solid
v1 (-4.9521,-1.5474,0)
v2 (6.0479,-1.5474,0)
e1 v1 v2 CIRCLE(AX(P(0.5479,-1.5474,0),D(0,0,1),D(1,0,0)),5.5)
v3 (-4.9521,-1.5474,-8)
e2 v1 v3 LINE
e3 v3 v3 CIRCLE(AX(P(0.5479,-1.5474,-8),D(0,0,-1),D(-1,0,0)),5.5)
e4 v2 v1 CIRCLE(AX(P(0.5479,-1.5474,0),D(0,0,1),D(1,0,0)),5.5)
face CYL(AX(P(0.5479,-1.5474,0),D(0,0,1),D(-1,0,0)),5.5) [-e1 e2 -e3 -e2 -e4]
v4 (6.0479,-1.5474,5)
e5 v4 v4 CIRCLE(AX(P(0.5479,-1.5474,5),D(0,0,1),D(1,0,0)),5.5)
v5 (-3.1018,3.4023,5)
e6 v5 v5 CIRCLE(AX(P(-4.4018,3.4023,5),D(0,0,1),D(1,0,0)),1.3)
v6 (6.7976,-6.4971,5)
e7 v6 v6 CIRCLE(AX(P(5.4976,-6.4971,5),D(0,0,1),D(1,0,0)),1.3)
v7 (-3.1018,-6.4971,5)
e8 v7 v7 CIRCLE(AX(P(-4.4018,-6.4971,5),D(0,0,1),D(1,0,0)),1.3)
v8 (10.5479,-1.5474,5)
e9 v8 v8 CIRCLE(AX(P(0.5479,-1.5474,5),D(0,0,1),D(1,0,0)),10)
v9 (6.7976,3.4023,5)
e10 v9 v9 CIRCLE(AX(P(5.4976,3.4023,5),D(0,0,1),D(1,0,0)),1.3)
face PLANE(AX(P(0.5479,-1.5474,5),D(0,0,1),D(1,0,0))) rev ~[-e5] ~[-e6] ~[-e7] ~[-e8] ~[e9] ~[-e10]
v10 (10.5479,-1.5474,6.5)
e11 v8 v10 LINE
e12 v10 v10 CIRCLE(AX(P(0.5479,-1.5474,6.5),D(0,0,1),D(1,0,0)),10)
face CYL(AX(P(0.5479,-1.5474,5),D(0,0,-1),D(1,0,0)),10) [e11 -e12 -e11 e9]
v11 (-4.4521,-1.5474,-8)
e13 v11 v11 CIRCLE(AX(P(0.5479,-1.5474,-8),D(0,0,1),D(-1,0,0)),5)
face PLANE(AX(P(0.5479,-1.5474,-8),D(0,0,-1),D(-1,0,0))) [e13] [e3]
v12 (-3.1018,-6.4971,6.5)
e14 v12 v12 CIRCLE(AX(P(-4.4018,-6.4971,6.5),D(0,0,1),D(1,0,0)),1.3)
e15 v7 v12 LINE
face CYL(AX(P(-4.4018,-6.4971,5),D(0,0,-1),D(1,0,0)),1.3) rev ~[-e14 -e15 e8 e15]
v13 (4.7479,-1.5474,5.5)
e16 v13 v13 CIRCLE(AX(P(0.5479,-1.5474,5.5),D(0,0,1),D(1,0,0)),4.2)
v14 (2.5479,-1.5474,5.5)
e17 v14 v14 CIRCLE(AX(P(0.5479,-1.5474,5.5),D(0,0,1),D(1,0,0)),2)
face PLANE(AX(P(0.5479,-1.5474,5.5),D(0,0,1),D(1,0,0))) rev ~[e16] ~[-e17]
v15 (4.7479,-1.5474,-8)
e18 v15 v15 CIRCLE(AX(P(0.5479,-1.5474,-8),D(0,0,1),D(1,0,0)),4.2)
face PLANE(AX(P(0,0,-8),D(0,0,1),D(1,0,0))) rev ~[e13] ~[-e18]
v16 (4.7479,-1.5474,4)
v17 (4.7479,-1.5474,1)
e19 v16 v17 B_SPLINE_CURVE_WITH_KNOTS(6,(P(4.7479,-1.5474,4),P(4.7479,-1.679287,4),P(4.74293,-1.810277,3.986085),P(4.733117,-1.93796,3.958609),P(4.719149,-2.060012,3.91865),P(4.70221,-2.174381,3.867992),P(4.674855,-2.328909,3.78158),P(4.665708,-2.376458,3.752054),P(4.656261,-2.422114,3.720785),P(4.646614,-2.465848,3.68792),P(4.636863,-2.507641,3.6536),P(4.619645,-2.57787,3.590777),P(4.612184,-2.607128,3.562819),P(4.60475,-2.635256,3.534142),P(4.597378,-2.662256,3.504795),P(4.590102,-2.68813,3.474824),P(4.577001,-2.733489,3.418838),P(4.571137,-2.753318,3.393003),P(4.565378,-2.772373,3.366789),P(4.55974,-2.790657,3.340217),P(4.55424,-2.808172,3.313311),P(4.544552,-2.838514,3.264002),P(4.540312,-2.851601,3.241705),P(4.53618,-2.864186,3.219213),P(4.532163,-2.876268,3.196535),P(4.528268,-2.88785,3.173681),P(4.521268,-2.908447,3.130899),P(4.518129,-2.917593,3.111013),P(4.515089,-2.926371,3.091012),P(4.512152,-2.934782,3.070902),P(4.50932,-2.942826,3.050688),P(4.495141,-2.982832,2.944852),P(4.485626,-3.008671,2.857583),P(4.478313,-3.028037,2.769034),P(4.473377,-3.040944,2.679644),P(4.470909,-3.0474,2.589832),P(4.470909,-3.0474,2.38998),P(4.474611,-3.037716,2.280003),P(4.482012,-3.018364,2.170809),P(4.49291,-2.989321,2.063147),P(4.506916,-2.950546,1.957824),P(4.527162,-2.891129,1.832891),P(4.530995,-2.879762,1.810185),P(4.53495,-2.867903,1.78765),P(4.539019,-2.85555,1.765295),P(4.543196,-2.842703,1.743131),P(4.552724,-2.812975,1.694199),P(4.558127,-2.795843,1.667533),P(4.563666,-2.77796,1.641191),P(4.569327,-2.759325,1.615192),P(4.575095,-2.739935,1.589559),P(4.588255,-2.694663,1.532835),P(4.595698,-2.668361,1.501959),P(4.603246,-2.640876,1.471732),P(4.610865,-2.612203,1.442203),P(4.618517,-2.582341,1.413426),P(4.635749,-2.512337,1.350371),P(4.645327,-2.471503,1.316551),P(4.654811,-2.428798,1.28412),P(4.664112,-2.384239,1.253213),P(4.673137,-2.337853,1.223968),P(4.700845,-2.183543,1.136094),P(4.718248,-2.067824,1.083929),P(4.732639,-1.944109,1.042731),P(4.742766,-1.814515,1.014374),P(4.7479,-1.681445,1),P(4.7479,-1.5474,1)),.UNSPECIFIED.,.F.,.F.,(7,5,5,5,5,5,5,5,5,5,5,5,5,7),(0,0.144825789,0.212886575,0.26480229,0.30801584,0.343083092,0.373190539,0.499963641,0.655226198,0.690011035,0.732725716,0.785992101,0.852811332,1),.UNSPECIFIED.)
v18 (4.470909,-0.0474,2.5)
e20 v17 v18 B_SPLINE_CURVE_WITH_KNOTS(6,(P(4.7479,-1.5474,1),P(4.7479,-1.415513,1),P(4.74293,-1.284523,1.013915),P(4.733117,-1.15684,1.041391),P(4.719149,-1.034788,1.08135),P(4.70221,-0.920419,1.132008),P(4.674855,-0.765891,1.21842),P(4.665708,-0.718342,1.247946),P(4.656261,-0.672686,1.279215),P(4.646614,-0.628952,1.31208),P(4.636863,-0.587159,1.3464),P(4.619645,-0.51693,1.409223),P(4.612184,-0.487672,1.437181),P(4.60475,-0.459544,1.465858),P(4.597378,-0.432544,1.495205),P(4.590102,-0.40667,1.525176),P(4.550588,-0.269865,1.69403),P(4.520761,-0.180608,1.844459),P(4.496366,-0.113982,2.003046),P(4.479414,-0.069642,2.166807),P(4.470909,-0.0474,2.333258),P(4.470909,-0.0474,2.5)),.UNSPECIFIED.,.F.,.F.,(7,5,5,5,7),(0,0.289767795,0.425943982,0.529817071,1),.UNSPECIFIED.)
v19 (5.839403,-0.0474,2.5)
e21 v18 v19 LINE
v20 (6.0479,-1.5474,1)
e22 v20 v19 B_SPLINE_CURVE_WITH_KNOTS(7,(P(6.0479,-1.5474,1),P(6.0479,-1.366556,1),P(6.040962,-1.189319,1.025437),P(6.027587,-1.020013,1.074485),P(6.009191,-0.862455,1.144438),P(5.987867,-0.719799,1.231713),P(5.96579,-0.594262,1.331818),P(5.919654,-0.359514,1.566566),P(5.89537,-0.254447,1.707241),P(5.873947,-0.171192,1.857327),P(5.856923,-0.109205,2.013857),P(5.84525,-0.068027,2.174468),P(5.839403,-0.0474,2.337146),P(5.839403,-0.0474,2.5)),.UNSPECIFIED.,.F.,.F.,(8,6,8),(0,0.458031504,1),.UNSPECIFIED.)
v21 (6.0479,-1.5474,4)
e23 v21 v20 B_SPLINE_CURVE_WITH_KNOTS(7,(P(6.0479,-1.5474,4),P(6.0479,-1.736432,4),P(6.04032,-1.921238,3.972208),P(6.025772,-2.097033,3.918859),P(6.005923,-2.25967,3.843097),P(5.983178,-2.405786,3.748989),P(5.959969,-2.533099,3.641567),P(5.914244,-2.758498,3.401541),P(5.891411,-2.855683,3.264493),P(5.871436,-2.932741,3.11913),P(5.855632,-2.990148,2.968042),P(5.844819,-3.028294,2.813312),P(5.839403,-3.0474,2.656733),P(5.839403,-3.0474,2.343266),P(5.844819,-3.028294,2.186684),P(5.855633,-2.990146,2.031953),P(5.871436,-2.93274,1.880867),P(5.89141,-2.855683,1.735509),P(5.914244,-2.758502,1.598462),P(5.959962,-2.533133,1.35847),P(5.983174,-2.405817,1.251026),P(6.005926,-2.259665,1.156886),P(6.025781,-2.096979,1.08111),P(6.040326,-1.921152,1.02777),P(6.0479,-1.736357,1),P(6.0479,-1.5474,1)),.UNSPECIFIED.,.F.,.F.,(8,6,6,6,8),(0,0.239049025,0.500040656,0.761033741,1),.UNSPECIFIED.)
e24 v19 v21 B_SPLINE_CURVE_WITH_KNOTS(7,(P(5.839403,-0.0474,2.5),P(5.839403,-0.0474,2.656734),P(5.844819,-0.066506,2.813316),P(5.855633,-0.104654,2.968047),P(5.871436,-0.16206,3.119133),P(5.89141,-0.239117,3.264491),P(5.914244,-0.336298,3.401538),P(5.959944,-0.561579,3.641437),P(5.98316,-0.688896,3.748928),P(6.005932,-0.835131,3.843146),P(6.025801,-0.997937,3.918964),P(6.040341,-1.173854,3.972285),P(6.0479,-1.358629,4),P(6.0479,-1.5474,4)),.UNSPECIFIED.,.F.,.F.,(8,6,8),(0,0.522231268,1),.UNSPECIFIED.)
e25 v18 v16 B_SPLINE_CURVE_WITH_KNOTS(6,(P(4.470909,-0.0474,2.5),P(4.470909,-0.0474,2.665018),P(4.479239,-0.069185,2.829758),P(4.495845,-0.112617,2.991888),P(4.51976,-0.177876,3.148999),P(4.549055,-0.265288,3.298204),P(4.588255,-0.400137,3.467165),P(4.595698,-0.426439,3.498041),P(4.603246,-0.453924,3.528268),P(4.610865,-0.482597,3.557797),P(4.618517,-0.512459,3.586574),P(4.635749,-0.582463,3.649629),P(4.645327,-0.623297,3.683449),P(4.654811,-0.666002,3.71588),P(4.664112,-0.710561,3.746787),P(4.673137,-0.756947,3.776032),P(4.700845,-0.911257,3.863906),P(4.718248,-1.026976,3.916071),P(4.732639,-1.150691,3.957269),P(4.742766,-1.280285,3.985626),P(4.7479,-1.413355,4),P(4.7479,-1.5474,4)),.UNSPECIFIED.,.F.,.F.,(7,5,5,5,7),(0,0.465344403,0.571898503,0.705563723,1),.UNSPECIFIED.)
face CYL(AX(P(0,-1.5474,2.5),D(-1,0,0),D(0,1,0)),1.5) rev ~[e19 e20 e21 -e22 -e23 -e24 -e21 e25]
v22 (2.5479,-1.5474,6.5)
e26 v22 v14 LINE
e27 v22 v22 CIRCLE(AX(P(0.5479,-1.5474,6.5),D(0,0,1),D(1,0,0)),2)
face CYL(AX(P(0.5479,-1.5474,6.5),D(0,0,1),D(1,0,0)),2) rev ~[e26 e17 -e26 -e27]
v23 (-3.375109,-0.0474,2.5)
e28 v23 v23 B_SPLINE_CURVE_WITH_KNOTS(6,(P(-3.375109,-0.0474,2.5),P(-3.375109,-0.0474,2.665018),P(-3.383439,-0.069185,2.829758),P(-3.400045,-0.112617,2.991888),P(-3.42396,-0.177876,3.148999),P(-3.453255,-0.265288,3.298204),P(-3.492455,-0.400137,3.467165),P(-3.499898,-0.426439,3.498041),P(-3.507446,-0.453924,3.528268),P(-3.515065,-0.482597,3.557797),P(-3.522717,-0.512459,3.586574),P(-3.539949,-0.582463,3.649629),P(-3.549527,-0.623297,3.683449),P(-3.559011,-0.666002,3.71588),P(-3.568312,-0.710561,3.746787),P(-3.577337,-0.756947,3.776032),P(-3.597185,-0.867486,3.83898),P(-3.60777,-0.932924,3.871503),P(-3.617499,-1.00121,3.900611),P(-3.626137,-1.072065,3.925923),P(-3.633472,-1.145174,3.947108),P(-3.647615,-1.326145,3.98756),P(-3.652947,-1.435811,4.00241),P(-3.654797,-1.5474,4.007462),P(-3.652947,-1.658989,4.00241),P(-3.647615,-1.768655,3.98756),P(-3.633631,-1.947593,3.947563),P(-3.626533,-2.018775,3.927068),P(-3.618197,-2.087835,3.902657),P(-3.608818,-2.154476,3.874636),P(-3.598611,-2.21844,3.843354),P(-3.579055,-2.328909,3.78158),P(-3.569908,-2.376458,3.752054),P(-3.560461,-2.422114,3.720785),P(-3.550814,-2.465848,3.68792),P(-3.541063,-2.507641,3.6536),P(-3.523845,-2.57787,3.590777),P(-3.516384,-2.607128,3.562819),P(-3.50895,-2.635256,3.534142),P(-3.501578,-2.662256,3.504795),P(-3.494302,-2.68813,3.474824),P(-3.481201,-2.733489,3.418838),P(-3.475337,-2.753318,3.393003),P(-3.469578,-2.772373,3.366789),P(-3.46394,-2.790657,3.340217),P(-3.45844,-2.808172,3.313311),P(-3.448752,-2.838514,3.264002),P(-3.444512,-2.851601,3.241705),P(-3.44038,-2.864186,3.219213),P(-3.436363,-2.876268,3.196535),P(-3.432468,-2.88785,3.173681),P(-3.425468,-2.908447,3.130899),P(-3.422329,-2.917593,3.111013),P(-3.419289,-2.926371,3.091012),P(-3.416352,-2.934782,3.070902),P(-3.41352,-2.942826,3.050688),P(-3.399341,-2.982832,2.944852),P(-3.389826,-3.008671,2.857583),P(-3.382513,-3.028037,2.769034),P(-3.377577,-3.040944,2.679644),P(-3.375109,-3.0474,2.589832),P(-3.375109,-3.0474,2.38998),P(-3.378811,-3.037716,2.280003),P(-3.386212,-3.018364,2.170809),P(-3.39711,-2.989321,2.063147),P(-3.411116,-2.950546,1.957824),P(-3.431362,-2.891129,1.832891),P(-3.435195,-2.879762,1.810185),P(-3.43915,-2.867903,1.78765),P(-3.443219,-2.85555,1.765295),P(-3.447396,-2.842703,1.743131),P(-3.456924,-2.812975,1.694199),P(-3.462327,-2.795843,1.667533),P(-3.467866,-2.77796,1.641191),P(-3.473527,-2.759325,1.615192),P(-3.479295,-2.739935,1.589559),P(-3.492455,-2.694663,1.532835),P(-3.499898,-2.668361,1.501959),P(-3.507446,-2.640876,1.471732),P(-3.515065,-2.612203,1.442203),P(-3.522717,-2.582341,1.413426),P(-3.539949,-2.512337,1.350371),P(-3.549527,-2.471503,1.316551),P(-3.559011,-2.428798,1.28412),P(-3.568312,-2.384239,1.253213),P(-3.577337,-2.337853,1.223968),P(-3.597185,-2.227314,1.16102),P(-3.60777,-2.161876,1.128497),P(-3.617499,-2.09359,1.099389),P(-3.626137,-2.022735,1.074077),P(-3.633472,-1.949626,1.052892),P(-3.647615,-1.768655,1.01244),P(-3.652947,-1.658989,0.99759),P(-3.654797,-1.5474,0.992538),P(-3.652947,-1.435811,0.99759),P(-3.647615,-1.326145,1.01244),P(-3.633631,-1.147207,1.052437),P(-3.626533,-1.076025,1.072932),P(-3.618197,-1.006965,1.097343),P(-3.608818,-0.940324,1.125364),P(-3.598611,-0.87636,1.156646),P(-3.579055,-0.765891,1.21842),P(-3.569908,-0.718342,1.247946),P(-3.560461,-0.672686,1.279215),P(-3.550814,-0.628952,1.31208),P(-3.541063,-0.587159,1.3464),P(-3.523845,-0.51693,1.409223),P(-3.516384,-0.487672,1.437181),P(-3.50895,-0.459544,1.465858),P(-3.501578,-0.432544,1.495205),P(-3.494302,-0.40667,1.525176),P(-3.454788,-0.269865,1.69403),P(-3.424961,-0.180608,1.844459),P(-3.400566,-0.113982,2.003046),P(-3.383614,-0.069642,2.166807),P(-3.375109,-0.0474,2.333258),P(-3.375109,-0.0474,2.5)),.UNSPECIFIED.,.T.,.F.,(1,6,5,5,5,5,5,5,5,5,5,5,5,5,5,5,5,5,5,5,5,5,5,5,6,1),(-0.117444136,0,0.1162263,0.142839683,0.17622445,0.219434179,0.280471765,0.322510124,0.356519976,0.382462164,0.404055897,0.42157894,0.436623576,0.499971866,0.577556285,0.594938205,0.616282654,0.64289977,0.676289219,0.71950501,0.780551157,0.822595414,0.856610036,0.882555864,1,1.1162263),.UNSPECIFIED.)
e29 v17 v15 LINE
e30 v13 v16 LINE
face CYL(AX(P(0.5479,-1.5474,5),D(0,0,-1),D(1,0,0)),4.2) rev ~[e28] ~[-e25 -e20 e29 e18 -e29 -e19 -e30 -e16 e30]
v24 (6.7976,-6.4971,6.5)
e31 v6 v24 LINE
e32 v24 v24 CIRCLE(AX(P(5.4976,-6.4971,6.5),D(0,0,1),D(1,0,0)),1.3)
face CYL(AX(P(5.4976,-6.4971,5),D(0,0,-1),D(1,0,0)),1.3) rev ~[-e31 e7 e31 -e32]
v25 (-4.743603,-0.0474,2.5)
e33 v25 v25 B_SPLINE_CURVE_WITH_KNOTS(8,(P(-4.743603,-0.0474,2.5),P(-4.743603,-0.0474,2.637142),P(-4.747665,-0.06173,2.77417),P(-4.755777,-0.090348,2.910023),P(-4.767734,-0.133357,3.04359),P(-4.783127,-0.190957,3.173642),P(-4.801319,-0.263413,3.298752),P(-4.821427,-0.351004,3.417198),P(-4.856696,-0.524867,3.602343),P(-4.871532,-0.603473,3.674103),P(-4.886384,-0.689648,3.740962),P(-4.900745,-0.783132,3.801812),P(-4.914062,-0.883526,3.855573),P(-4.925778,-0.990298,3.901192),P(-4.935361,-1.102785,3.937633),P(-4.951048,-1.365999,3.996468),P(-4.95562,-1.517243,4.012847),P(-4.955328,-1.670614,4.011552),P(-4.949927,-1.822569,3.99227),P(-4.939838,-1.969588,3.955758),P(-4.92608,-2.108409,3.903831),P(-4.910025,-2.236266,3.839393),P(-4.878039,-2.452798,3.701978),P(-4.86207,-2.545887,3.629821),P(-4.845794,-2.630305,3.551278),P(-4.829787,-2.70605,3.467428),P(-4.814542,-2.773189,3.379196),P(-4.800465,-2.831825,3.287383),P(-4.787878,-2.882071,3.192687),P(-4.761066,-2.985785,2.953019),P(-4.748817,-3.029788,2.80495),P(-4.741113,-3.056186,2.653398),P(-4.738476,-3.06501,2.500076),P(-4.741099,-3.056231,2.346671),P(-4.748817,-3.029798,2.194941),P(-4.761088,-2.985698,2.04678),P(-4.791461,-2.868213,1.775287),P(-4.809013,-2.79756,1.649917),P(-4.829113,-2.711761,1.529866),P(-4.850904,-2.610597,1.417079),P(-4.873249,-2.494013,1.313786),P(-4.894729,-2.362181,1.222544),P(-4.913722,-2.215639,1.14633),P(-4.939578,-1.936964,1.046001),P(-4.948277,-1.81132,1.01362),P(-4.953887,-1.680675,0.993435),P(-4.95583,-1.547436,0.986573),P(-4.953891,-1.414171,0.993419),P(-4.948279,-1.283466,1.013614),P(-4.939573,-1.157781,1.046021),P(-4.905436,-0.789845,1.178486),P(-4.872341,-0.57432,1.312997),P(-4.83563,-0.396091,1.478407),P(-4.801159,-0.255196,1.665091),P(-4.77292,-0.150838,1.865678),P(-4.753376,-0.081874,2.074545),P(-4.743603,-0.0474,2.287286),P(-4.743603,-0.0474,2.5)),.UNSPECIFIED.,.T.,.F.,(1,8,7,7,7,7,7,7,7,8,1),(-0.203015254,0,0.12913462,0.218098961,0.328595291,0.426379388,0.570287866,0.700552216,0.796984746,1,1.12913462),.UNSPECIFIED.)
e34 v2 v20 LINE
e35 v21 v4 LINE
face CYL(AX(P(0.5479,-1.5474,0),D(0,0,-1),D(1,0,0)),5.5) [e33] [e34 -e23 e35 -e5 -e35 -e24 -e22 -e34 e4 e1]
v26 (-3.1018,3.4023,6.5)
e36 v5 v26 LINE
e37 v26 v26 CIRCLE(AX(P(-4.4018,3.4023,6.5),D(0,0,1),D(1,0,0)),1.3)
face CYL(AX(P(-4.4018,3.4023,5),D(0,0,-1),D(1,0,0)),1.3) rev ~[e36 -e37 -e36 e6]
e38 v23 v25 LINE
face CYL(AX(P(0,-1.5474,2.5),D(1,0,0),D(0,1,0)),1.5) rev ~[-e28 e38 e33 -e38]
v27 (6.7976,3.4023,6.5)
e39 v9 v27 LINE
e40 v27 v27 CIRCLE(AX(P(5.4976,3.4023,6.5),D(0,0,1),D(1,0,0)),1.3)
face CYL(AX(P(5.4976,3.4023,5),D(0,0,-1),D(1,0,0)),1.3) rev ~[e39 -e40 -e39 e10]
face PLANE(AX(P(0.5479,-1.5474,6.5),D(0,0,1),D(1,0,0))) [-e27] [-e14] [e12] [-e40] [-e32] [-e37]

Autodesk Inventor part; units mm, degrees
ref_plane "YZ Plane" through (0, 0, 0) normal (1, 0, 0) x (0, 1, 0)
ref_plane "XZ Plane" through (0, 0, 0) normal (0, 1, 0) x (-1, 0, 0)
ref_plane "XY Plane" through (0, 0, 0) normal (0, 0, 1) x (1, 0, 0)
sketch "스케치1" plane through (0, 0, 0) normal (0, 0, 1) x (1, 0, 0)
  circle A0 centre (0.5479, -1.5474) radius 5.5
  circle A1 centre (0.5479, -1.5474) radius 5
  circle A2 centre (0.5479, -1.5474) radius 4.2
  ellipse E0 centre (0.5479, -1.5474) end of major axis (-0.0909, -9.0201) minor radius 7.4992
  ellipse E1 centre (0.5479, -1.5474) end of major axis (-0.0912, -9.0201) minor radius 7.4991
  ellipse E2 centre (0.5479, -1.5474) end of major axis (1.2999, 2.3813) minor radius 3.9993 (-3.4513, -1.5143) -> (4.5471, -1.5804) ccw projected
  dimension "d0" = 10
  dimension "d1" = 8.4
  dimension "d24" = 11
extrude "돌출1" add sketch "스케치1" against normal blind 8 contours A1
sketch "스케치2" plane through (0.5479, -1.5474, 0) normal (0, 0, 1) x (1, 0, 0)
  circle A0 centre (0, 0) radius 4.2 projected
  circle A1 centre (0, 0) radius 5.5
  dimension "d4" = 11
extrude "돌출2" add sketch "스케치2" along normal blind 5
sketch "스케치3" plane through (0.5479, -1.5474, 5) normal (0, 0, 1) x (1, 0, 0)
  circle A0 centre (0, 0) radius 5.5 projected
  circle A1 centre (0, 0) radius 4.2 projected
  circle A2 centre (0, 0) radius 10
  circle A3 centre (4.9497, -4.9497) radius 1.3
  circle A4 centre (0, 0) radius 5 projected
  line L0 (0, 0) -> (0, -5.5) construction
  circle A5 centre (4.9497, 4.9497) radius 1.3
  circle A6 centre (-4.9497, 4.9497) radius 1.3
  circle A7 centre (-4.9497, -4.9497) radius 1.3
  dimension "d9" = 20
  dimension "d10" = 2.6
  dimension "d11" = 7
  dimension "d12" = 45
  dimension "d15" = 360
extrude "돌출3" add sketch "스케치3" along normal blind 1.5 contours A0 | A2 | A4
sketch "스케치4" plane through (0.5479, -1.5474, 6.5) normal (0, 0, 1) x (1, 0, 0)
  circle A0 centre (0, 0) radius 4.2 projected
  circle A1 centre (0, 0) radius 2
  dimension "d17" = 4
extrude "돌출4" add sketch "스케치4" against normal blind 1
sketch "스케치5" plane through (0, 0, 0) normal (1, 0, 0) x (0, 1, 0)
  circle A0 centre (-1.5474, 2.5) radius 1.5
  line L0 (3.9526, 0) -> (-7.0474, 0) projected
  line L1 (3.9526, 5) -> (-7.0474, 5) projected
  line L2 (3.9526, 0) -> (-7.0474, 0) projected
  line L3 (-7.0474, 0) -> (-7.0474, 5) projected
  line L4 (3.9526, 0) -> (3.9526, 5) projected
  point P0 (0, 0)
  point P1 (-1.5474, 5)
  dimension "d20" = 3
  dimension "d21" = 2.5
extrude "돌출5" cut sketch "스케치5" along normal through all both and the other way through all contours A0
sketch "스케치6" plane through (0.5479, -1.5474, 0) normal (0, 0, -1) x (-1, 0, 0)
  circle A0 centre (0, 0) radius 5.5 projected
  circle A1 centre (0, 0) radius 5 projected
  point P0 (0.5479, 1.5474)
extrude "돌출6" add sketch "스케치6" along normal blind 8
properties part number "motor_clamp" material "고무, 검은색"
